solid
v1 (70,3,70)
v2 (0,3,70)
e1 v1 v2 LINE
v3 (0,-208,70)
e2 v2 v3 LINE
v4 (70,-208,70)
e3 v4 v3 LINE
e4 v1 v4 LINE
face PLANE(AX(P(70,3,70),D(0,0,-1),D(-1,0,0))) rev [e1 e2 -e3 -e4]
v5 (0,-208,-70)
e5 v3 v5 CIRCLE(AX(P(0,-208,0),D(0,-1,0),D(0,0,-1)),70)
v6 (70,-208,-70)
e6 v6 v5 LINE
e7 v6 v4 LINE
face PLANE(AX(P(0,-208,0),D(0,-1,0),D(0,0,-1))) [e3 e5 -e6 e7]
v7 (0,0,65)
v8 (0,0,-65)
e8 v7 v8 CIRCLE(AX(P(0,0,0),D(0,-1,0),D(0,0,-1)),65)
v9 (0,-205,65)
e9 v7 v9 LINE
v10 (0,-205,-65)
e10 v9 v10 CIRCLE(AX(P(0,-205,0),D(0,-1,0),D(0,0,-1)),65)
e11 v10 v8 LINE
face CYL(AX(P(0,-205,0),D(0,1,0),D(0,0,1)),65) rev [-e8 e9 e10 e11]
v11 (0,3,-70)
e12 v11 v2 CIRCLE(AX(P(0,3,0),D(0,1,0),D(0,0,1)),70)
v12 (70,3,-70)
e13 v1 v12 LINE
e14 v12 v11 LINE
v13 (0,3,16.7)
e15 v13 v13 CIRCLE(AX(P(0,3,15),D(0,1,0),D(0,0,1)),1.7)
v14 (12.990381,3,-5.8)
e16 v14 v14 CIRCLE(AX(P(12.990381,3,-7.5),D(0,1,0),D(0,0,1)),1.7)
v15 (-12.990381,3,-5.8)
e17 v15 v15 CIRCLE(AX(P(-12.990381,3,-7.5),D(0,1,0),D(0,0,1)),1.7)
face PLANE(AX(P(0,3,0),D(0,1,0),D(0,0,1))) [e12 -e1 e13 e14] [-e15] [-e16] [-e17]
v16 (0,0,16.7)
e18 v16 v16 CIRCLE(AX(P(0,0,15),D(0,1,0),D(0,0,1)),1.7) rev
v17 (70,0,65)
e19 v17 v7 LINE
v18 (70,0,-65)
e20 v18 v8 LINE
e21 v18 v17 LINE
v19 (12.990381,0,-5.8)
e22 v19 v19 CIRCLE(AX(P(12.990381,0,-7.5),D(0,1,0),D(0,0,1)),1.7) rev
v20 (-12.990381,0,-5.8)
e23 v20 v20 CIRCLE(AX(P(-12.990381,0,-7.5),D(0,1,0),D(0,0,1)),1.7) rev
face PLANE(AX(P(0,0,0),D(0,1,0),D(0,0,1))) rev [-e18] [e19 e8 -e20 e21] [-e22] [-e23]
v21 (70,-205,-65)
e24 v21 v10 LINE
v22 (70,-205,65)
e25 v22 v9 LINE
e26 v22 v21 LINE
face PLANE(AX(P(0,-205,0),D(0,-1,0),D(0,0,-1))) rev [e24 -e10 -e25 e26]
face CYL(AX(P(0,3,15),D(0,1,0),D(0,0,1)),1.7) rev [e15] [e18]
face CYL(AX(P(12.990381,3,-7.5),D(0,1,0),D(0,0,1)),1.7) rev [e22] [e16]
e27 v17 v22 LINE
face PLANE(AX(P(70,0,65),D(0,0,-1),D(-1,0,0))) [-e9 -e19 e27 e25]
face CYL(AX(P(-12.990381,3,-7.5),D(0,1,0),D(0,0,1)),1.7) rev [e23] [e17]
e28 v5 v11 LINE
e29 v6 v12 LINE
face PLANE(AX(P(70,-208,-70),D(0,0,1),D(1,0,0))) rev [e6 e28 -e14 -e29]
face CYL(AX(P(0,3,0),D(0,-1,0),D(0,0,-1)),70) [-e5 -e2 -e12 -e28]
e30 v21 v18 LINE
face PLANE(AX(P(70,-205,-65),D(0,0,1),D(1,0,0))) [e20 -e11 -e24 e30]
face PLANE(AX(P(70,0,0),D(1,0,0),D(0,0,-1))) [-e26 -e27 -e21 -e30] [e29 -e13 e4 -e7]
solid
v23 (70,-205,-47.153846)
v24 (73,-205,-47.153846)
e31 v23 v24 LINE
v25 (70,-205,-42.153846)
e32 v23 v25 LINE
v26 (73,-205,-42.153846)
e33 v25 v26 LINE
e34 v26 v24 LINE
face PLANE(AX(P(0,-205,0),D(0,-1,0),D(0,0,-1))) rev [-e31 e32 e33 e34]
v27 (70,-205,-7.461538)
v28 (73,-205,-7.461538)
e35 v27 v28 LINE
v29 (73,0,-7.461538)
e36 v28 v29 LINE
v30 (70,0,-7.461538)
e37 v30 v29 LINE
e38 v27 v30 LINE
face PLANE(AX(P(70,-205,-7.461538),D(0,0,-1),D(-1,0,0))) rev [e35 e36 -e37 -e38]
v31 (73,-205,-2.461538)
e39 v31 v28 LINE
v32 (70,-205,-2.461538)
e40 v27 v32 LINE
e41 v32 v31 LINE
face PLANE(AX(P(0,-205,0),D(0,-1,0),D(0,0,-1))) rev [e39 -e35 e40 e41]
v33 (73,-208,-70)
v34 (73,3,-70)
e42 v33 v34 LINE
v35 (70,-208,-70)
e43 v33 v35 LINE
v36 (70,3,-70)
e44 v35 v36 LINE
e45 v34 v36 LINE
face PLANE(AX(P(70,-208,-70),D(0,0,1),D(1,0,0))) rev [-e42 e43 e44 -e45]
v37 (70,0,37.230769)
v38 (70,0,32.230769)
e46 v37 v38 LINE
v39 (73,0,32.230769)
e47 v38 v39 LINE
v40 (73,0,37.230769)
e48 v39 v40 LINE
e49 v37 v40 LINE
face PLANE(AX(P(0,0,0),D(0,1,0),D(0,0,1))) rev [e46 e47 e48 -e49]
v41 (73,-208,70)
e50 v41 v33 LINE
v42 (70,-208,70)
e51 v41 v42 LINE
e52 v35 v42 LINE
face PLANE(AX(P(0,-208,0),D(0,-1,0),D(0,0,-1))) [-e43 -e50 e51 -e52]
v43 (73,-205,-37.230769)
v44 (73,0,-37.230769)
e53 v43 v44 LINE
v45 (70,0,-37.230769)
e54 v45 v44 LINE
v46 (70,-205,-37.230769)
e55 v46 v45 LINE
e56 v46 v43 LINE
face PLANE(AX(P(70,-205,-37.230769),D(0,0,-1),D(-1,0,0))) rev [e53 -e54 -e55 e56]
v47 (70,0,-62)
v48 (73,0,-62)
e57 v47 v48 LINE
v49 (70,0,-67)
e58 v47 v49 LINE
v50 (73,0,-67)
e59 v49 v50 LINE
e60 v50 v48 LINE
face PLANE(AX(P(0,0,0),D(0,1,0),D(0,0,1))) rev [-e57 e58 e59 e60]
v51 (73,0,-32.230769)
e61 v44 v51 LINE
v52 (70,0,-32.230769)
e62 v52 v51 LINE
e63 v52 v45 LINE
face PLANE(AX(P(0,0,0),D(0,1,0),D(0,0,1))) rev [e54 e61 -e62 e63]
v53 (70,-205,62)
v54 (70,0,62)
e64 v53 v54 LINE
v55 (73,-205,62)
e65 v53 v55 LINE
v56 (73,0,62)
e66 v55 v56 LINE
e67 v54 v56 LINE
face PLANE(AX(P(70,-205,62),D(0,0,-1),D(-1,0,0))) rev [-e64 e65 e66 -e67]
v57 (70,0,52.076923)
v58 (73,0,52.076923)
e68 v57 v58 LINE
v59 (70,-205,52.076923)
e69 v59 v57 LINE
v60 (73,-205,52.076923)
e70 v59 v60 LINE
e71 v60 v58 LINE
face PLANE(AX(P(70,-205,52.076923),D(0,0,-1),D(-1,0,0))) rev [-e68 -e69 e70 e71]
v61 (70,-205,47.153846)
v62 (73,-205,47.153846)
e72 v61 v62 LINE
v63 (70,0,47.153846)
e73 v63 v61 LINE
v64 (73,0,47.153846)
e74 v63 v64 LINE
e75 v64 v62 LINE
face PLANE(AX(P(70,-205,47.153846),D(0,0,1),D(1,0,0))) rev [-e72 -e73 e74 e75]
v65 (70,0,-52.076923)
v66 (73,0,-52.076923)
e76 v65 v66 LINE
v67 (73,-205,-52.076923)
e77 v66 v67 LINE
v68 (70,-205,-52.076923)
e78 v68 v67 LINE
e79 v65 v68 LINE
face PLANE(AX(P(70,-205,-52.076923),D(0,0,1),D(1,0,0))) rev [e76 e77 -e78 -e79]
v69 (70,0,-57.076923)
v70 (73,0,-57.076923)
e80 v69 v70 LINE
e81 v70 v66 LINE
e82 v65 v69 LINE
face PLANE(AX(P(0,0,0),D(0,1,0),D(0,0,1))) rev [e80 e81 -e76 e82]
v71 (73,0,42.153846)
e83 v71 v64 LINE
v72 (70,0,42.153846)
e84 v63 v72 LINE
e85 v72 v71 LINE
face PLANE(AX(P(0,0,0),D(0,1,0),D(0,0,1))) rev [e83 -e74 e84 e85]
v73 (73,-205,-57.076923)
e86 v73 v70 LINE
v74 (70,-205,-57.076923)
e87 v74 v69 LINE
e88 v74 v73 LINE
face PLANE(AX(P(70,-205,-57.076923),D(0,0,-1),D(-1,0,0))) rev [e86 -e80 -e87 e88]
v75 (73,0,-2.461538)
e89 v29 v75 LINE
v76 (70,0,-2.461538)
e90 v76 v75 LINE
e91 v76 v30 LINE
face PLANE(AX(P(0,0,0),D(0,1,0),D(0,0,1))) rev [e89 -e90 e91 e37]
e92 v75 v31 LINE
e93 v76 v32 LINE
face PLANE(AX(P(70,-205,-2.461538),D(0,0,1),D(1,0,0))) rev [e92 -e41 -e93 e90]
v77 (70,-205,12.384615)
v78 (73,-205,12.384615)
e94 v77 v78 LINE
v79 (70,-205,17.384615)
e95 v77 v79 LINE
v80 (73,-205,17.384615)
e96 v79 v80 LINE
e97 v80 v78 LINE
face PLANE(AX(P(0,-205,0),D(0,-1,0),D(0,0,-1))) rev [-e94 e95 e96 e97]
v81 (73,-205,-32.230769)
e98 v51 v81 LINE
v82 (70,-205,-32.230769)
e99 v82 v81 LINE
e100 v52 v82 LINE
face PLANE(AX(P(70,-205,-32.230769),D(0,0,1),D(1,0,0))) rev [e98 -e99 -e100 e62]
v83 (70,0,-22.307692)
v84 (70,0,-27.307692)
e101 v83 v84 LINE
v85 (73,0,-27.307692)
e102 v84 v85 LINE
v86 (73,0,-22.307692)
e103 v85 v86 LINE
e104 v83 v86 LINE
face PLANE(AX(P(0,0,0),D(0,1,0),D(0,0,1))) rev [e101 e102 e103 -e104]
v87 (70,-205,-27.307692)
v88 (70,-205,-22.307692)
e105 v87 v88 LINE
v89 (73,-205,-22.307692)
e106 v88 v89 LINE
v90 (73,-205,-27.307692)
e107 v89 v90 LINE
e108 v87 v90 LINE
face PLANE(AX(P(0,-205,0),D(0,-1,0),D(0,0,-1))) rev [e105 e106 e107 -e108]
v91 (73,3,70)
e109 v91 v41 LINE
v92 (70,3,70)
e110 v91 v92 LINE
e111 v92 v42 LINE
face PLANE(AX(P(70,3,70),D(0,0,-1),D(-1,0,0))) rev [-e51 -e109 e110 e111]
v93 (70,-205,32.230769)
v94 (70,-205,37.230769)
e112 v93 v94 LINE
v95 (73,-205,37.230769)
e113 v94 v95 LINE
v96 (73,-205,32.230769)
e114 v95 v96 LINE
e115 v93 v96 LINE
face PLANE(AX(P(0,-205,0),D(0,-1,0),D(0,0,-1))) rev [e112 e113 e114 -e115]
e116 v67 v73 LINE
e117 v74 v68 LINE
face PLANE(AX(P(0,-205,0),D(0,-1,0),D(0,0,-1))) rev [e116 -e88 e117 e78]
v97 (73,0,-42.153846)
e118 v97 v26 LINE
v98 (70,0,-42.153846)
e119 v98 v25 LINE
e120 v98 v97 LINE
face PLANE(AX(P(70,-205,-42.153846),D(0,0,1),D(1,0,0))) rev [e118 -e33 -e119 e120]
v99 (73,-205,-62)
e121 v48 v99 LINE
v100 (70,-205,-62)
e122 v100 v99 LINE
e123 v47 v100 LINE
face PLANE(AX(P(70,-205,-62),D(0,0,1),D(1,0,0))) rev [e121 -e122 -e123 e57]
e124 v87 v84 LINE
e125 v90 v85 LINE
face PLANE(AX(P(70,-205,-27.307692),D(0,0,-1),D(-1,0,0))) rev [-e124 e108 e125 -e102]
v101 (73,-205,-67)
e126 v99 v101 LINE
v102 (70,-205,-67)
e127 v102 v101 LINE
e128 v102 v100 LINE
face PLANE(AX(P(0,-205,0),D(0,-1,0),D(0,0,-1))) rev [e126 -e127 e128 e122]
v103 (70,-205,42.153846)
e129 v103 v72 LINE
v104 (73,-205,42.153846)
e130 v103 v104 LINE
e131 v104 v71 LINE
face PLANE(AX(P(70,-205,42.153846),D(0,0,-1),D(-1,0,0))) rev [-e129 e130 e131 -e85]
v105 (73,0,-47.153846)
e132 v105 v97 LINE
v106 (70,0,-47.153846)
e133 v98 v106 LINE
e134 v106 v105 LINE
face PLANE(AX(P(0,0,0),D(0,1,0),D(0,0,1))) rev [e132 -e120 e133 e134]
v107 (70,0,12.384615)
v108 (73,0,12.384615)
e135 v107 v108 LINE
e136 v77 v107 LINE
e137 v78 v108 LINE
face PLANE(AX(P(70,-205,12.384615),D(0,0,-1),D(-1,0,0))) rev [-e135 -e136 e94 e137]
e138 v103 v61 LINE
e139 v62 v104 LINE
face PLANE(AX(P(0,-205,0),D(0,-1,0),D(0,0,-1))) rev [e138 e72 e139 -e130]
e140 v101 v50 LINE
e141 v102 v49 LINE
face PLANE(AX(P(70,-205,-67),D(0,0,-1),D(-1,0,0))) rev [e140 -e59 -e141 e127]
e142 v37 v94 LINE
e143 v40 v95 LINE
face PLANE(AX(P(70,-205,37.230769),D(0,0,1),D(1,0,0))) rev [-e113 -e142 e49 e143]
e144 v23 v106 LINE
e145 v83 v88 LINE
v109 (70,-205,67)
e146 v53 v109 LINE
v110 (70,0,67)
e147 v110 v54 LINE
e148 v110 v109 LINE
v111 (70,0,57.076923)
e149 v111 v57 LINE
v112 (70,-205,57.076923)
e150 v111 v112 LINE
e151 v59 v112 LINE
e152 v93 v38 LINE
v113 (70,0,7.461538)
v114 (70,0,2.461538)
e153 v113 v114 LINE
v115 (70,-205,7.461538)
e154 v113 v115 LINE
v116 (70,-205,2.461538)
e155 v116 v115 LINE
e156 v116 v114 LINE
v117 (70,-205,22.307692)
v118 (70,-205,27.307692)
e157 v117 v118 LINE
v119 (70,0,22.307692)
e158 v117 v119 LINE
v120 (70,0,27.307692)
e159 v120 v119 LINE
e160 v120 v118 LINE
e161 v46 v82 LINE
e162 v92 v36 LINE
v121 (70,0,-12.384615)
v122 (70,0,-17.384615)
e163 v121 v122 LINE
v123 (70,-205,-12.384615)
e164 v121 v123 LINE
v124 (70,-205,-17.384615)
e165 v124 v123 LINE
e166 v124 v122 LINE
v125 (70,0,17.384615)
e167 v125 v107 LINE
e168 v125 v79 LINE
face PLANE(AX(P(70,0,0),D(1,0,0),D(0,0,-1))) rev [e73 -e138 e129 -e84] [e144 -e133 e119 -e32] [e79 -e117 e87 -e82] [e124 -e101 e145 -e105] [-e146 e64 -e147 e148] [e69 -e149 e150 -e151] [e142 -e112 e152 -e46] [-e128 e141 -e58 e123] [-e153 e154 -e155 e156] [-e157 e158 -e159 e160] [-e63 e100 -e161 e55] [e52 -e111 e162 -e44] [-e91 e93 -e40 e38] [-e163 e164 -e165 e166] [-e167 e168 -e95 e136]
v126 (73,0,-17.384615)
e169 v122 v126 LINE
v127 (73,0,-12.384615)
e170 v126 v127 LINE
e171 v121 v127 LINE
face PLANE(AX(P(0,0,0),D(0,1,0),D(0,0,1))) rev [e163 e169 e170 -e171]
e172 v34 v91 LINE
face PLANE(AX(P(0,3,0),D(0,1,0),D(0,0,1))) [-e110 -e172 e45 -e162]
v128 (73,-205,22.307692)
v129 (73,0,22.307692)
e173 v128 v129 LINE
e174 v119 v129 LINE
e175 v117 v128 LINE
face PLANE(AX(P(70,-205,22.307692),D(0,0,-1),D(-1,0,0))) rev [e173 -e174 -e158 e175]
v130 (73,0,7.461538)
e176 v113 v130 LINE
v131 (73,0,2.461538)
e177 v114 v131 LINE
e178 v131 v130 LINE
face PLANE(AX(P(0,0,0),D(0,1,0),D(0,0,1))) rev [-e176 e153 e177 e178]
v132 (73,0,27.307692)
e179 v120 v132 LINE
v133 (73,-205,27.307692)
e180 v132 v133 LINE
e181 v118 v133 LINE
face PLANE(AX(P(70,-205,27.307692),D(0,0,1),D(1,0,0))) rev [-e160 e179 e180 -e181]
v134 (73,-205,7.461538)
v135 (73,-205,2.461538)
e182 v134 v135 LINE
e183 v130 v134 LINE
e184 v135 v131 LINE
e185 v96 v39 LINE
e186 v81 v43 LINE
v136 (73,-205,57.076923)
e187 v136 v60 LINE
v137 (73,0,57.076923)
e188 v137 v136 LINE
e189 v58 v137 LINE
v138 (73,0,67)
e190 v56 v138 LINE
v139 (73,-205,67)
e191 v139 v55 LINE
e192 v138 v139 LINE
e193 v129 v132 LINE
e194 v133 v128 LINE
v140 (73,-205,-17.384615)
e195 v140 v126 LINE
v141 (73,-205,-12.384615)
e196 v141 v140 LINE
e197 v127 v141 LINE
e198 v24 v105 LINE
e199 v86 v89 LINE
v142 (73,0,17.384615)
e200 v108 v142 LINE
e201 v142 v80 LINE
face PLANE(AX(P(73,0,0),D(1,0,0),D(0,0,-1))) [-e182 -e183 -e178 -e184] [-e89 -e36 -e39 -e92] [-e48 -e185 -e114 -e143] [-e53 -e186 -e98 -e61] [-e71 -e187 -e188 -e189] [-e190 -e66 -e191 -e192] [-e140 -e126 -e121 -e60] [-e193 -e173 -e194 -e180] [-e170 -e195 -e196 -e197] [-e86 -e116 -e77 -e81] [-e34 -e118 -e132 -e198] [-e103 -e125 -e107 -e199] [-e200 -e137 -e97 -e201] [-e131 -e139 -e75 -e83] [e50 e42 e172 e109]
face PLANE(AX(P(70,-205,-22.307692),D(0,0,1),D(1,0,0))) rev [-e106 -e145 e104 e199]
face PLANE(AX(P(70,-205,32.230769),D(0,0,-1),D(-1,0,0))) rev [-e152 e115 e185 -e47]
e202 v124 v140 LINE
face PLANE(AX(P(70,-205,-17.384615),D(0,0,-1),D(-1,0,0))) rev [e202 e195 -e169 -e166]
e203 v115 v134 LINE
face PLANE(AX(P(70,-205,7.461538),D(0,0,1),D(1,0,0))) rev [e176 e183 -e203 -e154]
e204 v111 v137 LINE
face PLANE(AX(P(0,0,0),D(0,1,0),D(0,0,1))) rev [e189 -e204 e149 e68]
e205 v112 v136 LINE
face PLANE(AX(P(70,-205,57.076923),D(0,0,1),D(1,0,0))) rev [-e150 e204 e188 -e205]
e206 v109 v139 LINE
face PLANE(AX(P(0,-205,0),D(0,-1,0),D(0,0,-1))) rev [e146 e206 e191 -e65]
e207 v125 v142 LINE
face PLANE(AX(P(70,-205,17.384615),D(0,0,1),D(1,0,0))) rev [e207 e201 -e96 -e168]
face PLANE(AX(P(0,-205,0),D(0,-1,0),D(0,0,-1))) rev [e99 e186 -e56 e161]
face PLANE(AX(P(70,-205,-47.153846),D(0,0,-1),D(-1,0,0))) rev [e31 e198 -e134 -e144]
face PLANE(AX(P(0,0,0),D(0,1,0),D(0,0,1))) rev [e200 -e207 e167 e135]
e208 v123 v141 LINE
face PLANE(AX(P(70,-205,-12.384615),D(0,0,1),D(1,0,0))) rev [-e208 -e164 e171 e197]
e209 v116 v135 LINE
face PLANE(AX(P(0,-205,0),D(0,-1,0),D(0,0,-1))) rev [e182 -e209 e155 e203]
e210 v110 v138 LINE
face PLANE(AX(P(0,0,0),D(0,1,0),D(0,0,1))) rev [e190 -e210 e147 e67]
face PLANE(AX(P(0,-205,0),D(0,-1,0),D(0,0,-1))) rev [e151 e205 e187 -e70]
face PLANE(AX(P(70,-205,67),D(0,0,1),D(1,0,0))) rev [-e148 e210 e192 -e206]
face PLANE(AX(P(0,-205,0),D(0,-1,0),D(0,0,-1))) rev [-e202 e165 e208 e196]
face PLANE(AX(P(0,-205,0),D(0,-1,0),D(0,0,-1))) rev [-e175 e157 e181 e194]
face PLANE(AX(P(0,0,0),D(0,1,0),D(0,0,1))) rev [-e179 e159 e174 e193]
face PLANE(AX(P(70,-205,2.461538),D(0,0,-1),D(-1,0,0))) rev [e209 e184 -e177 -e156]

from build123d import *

# Parameters (mm, degrees)
SKETCH1_R                     = 70
BOSS_EXTRUDE1_DEPTH           = 3
BOSS_EXTRUDE2_START           = 205
SKETCH4_R                     = 70
SKETCH4_R_2                   = 65
BOSS_EXTRUDE2_DEPTH           = 205
BOSS_EXTRUDE3_START           = 3
SKETCH5_R                     = 70
BOSS_EXTRUDE3_DEPTH           = 3
BODY_DELETE_KEEP_START        = -208
BODY_DELETE_KEEP_1_DEPTH      = 211
SKETCH6_W                     = 211
SKETCH6_H                     = 140
SKETCH6_W_2                   = 205
SKETCH6_H_2                   = 130
BOSS_EXTRUDE4_DEPTH           = 70
SKETCH7_W                     = 211
SKETCH7_H                     = 140
BOSS_EXTRUDE5_DEPTH           = 3
SKETCH8_W                     = 205
SKETCH8_H                     = 5
CUT_EXTRUDE1_DEPTH            = 3
M3_CLEARANCE_HOLE1_AT_2_COUNT = 2
M3_CLEARANCE_HOLE1_AT_2_PITCH = 25.980762114
M3_CLEARANCE_HOLE1_AT_3_COUNT = 2
M3_CLEARANCE_HOLE1_AT_3_PITCH = 25.980762114


# Read off the part's stored shape, not the designer's step: Body-Delete/Keep 1
with BuildPart() as part:
    # Sketch1 → Boss-Extrude1 (new body)
    with BuildSketch(Plane(origin=(0, 0, 0), x_dir=(-1, 0, 0), z_dir=(0, 1, 0))):
        with Locations(Location((0, 0, 0), (0, 0, 90))):
            Circle(SKETCH1_R)
    extrude(amount=BOSS_EXTRUDE1_DEPTH)

    # Sketch4 → Boss-Extrude2 (add)
    with BuildSketch(Plane.XZ.offset(BOSS_EXTRUDE2_START)):
        with Locations(Location((0, 0, 0), (0, 0, 270))):
            Circle(SKETCH4_R)
        with Locations(Location((0, 0, 0), (0, 0, 90))):
            Circle(SKETCH4_R_2, mode=Mode.SUBTRACT)
    extrude(amount=-BOSS_EXTRUDE2_DEPTH)

    # Sketch5 → Boss-Extrude3 (add)
    with BuildSketch(Plane.XZ.offset(205).offset(BOSS_EXTRUDE3_START)):
        with Locations(Location((0, 0, 0), (0, 0, 270))):
            Circle(SKETCH5_R)
    extrude(amount=-BOSS_EXTRUDE3_DEPTH)


with BuildPart() as body_2:
    # Split1: the piece on the far side of the plane
    add(part.part)
    split(bisect_by=Plane(origin=(0, 0, 0), x_dir=(0, 0, 1), z_dir=(1, 0, 0)), keep=Keep.BOTTOM)

    # Sketch6 → Boss-Extrude4 (add)
    with BuildSketch(Plane.YZ):
        with Locations((-102.5, 0)):
            Rectangle(SKETCH6_W, SKETCH6_H)
        with Locations((-102.5, 0)):
            Rectangle(SKETCH6_W_2, SKETCH6_H_2, mode=Mode.SUBTRACT)
    extrude(amount=BOSS_EXTRUDE4_DEPTH)

    # Sketch7 → Boss-Extrude5 (add)
    with BuildSketch(Plane.YZ.offset(70)):
        with Locations((-102.5, 0)):
            Rectangle(SKETCH7_W, SKETCH7_H)
    extrude(amount=BOSS_EXTRUDE5_DEPTH)

    # Sketch8 → Cut-Extrude1 (cut)
    with BuildSketch(Plane.YZ.offset(73)):
        with Locations((-102.5, 64.5)):
            Rectangle(SKETCH8_W, SKETCH8_H)
        with Locations((-102.5, 54.576923077)):
            Rectangle(SKETCH8_W, SKETCH8_H)
        with Locations((-102.5, 44.653846154)):
            Rectangle(SKETCH8_W, SKETCH8_H)
        with Locations((-102.5, 34.730769231)):
            Rectangle(SKETCH8_W, SKETCH8_H)
        with Locations((-102.5, 24.807692308)):
            Rectangle(SKETCH8_W, SKETCH8_H)
        with Locations((-102.5, 14.884615385)):
            Rectangle(SKETCH8_W, SKETCH8_H)
        with Locations((-102.5, 4.961538462)):
            Rectangle(SKETCH8_W, SKETCH8_H)
        with Locations((-102.5, -4.961538462)):
            Rectangle(SKETCH8_W, SKETCH8_H)
        with Locations((-102.5, -14.884615385)):
            Rectangle(SKETCH8_W, SKETCH8_H)
        with Locations((-102.5, -24.807692308)):
            Rectangle(SKETCH8_W, SKETCH8_H)
        with Locations((-102.5, -34.730769231)):
            Rectangle(SKETCH8_W, SKETCH8_H)
        with Locations((-102.5, -44.653846154)):
            Rectangle(SKETCH8_W, SKETCH8_H)
        with Locations((-102.5, -54.576923077)):
            Rectangle(SKETCH8_W, SKETCH8_H)
        with Locations((-102.5, -64.5)):
            Rectangle(SKETCH8_W, SKETCH8_H)
    extrude(amount=-CUT_EXTRUDE1_DEPTH, mode=Mode.SUBTRACT)


with BuildPart() as part_1:
    add(part.part)

    # Split1
    split(bisect_by=Plane(origin=(0, 0, 0), x_dir=(0, 0, 1), z_dir=(1, 0, 0)), keep=Keep.TOP)

    # Body-Delete/Keep 1 outline → Body-Delete/Keep 1 (cut)
    with BuildSketch(Plane(origin=(0, 0, 0), x_dir=(1, 0, 0), z_dir=(0, 1, 0)).offset(BODY_DELETE_KEEP_START)):
        with BuildLine():
            ThreePointArc((0, -70), (70, 0), (0, 70))
            Line((0, 70), (0, -70))
        make_face()
    extrude(amount=BODY_DELETE_KEEP_1_DEPTH, mode=Mode.SUBTRACT)


with BuildPart() as body_2_2:
    # Split2: the piece on the far side of the plane
    add(body_2.part)
    split(bisect_by=Plane(origin=(70, 0, 0), x_dir=(0, 0, 1), z_dir=(1, 0, 0)), keep=Keep.BOTTOM)

    # Sketch10 → M3 Clearance Hole1 (revolve, cut)
    with BuildSketch(Plane(origin=(12.990381057, 3, -7.5), x_dir=(0, 0, 1), z_dir=(1, 0, 0))):
        Polygon((0, 0), (0, 4.021463052), (1.7, 3), (1.7, 0), align=None)
    m3_clearance_hole1 = revolve(axis=Axis((12.990381057, 9.35, -7.5), (0, -1, 0)), mode=Mode.SUBTRACT)

    # M3 Clearance Hole1 at 2: M3 Clearance Hole1 ×2
    with Locations(*[Vector(-0.4999999999999635, 0, 0.8660254037844598) * (i * M3_CLEARANCE_HOLE1_AT_2_PITCH) for i in range(1, M3_CLEARANCE_HOLE1_AT_2_COUNT)]):
        add(m3_clearance_hole1, mode=Mode.SUBTRACT)

    # M3 Clearance Hole1 at 3: M3 Clearance Hole1 ×2
    with Locations(*[(-i * M3_CLEARANCE_HOLE1_AT_3_PITCH, 0, 0) for i in range(1, M3_CLEARANCE_HOLE1_AT_3_COUNT)]):
        add(m3_clearance_hole1, mode=Mode.SUBTRACT)


with BuildPart() as body_2_1:
    add(body_2.part)

    # Split2
    split(bisect_by=Plane(origin=(70, 0, 0), x_dir=(0, 0, 1), z_dir=(1, 0, 0)), keep=Keep.TOP)


solid = Compound([body_2_2.part, body_2_1.part])
